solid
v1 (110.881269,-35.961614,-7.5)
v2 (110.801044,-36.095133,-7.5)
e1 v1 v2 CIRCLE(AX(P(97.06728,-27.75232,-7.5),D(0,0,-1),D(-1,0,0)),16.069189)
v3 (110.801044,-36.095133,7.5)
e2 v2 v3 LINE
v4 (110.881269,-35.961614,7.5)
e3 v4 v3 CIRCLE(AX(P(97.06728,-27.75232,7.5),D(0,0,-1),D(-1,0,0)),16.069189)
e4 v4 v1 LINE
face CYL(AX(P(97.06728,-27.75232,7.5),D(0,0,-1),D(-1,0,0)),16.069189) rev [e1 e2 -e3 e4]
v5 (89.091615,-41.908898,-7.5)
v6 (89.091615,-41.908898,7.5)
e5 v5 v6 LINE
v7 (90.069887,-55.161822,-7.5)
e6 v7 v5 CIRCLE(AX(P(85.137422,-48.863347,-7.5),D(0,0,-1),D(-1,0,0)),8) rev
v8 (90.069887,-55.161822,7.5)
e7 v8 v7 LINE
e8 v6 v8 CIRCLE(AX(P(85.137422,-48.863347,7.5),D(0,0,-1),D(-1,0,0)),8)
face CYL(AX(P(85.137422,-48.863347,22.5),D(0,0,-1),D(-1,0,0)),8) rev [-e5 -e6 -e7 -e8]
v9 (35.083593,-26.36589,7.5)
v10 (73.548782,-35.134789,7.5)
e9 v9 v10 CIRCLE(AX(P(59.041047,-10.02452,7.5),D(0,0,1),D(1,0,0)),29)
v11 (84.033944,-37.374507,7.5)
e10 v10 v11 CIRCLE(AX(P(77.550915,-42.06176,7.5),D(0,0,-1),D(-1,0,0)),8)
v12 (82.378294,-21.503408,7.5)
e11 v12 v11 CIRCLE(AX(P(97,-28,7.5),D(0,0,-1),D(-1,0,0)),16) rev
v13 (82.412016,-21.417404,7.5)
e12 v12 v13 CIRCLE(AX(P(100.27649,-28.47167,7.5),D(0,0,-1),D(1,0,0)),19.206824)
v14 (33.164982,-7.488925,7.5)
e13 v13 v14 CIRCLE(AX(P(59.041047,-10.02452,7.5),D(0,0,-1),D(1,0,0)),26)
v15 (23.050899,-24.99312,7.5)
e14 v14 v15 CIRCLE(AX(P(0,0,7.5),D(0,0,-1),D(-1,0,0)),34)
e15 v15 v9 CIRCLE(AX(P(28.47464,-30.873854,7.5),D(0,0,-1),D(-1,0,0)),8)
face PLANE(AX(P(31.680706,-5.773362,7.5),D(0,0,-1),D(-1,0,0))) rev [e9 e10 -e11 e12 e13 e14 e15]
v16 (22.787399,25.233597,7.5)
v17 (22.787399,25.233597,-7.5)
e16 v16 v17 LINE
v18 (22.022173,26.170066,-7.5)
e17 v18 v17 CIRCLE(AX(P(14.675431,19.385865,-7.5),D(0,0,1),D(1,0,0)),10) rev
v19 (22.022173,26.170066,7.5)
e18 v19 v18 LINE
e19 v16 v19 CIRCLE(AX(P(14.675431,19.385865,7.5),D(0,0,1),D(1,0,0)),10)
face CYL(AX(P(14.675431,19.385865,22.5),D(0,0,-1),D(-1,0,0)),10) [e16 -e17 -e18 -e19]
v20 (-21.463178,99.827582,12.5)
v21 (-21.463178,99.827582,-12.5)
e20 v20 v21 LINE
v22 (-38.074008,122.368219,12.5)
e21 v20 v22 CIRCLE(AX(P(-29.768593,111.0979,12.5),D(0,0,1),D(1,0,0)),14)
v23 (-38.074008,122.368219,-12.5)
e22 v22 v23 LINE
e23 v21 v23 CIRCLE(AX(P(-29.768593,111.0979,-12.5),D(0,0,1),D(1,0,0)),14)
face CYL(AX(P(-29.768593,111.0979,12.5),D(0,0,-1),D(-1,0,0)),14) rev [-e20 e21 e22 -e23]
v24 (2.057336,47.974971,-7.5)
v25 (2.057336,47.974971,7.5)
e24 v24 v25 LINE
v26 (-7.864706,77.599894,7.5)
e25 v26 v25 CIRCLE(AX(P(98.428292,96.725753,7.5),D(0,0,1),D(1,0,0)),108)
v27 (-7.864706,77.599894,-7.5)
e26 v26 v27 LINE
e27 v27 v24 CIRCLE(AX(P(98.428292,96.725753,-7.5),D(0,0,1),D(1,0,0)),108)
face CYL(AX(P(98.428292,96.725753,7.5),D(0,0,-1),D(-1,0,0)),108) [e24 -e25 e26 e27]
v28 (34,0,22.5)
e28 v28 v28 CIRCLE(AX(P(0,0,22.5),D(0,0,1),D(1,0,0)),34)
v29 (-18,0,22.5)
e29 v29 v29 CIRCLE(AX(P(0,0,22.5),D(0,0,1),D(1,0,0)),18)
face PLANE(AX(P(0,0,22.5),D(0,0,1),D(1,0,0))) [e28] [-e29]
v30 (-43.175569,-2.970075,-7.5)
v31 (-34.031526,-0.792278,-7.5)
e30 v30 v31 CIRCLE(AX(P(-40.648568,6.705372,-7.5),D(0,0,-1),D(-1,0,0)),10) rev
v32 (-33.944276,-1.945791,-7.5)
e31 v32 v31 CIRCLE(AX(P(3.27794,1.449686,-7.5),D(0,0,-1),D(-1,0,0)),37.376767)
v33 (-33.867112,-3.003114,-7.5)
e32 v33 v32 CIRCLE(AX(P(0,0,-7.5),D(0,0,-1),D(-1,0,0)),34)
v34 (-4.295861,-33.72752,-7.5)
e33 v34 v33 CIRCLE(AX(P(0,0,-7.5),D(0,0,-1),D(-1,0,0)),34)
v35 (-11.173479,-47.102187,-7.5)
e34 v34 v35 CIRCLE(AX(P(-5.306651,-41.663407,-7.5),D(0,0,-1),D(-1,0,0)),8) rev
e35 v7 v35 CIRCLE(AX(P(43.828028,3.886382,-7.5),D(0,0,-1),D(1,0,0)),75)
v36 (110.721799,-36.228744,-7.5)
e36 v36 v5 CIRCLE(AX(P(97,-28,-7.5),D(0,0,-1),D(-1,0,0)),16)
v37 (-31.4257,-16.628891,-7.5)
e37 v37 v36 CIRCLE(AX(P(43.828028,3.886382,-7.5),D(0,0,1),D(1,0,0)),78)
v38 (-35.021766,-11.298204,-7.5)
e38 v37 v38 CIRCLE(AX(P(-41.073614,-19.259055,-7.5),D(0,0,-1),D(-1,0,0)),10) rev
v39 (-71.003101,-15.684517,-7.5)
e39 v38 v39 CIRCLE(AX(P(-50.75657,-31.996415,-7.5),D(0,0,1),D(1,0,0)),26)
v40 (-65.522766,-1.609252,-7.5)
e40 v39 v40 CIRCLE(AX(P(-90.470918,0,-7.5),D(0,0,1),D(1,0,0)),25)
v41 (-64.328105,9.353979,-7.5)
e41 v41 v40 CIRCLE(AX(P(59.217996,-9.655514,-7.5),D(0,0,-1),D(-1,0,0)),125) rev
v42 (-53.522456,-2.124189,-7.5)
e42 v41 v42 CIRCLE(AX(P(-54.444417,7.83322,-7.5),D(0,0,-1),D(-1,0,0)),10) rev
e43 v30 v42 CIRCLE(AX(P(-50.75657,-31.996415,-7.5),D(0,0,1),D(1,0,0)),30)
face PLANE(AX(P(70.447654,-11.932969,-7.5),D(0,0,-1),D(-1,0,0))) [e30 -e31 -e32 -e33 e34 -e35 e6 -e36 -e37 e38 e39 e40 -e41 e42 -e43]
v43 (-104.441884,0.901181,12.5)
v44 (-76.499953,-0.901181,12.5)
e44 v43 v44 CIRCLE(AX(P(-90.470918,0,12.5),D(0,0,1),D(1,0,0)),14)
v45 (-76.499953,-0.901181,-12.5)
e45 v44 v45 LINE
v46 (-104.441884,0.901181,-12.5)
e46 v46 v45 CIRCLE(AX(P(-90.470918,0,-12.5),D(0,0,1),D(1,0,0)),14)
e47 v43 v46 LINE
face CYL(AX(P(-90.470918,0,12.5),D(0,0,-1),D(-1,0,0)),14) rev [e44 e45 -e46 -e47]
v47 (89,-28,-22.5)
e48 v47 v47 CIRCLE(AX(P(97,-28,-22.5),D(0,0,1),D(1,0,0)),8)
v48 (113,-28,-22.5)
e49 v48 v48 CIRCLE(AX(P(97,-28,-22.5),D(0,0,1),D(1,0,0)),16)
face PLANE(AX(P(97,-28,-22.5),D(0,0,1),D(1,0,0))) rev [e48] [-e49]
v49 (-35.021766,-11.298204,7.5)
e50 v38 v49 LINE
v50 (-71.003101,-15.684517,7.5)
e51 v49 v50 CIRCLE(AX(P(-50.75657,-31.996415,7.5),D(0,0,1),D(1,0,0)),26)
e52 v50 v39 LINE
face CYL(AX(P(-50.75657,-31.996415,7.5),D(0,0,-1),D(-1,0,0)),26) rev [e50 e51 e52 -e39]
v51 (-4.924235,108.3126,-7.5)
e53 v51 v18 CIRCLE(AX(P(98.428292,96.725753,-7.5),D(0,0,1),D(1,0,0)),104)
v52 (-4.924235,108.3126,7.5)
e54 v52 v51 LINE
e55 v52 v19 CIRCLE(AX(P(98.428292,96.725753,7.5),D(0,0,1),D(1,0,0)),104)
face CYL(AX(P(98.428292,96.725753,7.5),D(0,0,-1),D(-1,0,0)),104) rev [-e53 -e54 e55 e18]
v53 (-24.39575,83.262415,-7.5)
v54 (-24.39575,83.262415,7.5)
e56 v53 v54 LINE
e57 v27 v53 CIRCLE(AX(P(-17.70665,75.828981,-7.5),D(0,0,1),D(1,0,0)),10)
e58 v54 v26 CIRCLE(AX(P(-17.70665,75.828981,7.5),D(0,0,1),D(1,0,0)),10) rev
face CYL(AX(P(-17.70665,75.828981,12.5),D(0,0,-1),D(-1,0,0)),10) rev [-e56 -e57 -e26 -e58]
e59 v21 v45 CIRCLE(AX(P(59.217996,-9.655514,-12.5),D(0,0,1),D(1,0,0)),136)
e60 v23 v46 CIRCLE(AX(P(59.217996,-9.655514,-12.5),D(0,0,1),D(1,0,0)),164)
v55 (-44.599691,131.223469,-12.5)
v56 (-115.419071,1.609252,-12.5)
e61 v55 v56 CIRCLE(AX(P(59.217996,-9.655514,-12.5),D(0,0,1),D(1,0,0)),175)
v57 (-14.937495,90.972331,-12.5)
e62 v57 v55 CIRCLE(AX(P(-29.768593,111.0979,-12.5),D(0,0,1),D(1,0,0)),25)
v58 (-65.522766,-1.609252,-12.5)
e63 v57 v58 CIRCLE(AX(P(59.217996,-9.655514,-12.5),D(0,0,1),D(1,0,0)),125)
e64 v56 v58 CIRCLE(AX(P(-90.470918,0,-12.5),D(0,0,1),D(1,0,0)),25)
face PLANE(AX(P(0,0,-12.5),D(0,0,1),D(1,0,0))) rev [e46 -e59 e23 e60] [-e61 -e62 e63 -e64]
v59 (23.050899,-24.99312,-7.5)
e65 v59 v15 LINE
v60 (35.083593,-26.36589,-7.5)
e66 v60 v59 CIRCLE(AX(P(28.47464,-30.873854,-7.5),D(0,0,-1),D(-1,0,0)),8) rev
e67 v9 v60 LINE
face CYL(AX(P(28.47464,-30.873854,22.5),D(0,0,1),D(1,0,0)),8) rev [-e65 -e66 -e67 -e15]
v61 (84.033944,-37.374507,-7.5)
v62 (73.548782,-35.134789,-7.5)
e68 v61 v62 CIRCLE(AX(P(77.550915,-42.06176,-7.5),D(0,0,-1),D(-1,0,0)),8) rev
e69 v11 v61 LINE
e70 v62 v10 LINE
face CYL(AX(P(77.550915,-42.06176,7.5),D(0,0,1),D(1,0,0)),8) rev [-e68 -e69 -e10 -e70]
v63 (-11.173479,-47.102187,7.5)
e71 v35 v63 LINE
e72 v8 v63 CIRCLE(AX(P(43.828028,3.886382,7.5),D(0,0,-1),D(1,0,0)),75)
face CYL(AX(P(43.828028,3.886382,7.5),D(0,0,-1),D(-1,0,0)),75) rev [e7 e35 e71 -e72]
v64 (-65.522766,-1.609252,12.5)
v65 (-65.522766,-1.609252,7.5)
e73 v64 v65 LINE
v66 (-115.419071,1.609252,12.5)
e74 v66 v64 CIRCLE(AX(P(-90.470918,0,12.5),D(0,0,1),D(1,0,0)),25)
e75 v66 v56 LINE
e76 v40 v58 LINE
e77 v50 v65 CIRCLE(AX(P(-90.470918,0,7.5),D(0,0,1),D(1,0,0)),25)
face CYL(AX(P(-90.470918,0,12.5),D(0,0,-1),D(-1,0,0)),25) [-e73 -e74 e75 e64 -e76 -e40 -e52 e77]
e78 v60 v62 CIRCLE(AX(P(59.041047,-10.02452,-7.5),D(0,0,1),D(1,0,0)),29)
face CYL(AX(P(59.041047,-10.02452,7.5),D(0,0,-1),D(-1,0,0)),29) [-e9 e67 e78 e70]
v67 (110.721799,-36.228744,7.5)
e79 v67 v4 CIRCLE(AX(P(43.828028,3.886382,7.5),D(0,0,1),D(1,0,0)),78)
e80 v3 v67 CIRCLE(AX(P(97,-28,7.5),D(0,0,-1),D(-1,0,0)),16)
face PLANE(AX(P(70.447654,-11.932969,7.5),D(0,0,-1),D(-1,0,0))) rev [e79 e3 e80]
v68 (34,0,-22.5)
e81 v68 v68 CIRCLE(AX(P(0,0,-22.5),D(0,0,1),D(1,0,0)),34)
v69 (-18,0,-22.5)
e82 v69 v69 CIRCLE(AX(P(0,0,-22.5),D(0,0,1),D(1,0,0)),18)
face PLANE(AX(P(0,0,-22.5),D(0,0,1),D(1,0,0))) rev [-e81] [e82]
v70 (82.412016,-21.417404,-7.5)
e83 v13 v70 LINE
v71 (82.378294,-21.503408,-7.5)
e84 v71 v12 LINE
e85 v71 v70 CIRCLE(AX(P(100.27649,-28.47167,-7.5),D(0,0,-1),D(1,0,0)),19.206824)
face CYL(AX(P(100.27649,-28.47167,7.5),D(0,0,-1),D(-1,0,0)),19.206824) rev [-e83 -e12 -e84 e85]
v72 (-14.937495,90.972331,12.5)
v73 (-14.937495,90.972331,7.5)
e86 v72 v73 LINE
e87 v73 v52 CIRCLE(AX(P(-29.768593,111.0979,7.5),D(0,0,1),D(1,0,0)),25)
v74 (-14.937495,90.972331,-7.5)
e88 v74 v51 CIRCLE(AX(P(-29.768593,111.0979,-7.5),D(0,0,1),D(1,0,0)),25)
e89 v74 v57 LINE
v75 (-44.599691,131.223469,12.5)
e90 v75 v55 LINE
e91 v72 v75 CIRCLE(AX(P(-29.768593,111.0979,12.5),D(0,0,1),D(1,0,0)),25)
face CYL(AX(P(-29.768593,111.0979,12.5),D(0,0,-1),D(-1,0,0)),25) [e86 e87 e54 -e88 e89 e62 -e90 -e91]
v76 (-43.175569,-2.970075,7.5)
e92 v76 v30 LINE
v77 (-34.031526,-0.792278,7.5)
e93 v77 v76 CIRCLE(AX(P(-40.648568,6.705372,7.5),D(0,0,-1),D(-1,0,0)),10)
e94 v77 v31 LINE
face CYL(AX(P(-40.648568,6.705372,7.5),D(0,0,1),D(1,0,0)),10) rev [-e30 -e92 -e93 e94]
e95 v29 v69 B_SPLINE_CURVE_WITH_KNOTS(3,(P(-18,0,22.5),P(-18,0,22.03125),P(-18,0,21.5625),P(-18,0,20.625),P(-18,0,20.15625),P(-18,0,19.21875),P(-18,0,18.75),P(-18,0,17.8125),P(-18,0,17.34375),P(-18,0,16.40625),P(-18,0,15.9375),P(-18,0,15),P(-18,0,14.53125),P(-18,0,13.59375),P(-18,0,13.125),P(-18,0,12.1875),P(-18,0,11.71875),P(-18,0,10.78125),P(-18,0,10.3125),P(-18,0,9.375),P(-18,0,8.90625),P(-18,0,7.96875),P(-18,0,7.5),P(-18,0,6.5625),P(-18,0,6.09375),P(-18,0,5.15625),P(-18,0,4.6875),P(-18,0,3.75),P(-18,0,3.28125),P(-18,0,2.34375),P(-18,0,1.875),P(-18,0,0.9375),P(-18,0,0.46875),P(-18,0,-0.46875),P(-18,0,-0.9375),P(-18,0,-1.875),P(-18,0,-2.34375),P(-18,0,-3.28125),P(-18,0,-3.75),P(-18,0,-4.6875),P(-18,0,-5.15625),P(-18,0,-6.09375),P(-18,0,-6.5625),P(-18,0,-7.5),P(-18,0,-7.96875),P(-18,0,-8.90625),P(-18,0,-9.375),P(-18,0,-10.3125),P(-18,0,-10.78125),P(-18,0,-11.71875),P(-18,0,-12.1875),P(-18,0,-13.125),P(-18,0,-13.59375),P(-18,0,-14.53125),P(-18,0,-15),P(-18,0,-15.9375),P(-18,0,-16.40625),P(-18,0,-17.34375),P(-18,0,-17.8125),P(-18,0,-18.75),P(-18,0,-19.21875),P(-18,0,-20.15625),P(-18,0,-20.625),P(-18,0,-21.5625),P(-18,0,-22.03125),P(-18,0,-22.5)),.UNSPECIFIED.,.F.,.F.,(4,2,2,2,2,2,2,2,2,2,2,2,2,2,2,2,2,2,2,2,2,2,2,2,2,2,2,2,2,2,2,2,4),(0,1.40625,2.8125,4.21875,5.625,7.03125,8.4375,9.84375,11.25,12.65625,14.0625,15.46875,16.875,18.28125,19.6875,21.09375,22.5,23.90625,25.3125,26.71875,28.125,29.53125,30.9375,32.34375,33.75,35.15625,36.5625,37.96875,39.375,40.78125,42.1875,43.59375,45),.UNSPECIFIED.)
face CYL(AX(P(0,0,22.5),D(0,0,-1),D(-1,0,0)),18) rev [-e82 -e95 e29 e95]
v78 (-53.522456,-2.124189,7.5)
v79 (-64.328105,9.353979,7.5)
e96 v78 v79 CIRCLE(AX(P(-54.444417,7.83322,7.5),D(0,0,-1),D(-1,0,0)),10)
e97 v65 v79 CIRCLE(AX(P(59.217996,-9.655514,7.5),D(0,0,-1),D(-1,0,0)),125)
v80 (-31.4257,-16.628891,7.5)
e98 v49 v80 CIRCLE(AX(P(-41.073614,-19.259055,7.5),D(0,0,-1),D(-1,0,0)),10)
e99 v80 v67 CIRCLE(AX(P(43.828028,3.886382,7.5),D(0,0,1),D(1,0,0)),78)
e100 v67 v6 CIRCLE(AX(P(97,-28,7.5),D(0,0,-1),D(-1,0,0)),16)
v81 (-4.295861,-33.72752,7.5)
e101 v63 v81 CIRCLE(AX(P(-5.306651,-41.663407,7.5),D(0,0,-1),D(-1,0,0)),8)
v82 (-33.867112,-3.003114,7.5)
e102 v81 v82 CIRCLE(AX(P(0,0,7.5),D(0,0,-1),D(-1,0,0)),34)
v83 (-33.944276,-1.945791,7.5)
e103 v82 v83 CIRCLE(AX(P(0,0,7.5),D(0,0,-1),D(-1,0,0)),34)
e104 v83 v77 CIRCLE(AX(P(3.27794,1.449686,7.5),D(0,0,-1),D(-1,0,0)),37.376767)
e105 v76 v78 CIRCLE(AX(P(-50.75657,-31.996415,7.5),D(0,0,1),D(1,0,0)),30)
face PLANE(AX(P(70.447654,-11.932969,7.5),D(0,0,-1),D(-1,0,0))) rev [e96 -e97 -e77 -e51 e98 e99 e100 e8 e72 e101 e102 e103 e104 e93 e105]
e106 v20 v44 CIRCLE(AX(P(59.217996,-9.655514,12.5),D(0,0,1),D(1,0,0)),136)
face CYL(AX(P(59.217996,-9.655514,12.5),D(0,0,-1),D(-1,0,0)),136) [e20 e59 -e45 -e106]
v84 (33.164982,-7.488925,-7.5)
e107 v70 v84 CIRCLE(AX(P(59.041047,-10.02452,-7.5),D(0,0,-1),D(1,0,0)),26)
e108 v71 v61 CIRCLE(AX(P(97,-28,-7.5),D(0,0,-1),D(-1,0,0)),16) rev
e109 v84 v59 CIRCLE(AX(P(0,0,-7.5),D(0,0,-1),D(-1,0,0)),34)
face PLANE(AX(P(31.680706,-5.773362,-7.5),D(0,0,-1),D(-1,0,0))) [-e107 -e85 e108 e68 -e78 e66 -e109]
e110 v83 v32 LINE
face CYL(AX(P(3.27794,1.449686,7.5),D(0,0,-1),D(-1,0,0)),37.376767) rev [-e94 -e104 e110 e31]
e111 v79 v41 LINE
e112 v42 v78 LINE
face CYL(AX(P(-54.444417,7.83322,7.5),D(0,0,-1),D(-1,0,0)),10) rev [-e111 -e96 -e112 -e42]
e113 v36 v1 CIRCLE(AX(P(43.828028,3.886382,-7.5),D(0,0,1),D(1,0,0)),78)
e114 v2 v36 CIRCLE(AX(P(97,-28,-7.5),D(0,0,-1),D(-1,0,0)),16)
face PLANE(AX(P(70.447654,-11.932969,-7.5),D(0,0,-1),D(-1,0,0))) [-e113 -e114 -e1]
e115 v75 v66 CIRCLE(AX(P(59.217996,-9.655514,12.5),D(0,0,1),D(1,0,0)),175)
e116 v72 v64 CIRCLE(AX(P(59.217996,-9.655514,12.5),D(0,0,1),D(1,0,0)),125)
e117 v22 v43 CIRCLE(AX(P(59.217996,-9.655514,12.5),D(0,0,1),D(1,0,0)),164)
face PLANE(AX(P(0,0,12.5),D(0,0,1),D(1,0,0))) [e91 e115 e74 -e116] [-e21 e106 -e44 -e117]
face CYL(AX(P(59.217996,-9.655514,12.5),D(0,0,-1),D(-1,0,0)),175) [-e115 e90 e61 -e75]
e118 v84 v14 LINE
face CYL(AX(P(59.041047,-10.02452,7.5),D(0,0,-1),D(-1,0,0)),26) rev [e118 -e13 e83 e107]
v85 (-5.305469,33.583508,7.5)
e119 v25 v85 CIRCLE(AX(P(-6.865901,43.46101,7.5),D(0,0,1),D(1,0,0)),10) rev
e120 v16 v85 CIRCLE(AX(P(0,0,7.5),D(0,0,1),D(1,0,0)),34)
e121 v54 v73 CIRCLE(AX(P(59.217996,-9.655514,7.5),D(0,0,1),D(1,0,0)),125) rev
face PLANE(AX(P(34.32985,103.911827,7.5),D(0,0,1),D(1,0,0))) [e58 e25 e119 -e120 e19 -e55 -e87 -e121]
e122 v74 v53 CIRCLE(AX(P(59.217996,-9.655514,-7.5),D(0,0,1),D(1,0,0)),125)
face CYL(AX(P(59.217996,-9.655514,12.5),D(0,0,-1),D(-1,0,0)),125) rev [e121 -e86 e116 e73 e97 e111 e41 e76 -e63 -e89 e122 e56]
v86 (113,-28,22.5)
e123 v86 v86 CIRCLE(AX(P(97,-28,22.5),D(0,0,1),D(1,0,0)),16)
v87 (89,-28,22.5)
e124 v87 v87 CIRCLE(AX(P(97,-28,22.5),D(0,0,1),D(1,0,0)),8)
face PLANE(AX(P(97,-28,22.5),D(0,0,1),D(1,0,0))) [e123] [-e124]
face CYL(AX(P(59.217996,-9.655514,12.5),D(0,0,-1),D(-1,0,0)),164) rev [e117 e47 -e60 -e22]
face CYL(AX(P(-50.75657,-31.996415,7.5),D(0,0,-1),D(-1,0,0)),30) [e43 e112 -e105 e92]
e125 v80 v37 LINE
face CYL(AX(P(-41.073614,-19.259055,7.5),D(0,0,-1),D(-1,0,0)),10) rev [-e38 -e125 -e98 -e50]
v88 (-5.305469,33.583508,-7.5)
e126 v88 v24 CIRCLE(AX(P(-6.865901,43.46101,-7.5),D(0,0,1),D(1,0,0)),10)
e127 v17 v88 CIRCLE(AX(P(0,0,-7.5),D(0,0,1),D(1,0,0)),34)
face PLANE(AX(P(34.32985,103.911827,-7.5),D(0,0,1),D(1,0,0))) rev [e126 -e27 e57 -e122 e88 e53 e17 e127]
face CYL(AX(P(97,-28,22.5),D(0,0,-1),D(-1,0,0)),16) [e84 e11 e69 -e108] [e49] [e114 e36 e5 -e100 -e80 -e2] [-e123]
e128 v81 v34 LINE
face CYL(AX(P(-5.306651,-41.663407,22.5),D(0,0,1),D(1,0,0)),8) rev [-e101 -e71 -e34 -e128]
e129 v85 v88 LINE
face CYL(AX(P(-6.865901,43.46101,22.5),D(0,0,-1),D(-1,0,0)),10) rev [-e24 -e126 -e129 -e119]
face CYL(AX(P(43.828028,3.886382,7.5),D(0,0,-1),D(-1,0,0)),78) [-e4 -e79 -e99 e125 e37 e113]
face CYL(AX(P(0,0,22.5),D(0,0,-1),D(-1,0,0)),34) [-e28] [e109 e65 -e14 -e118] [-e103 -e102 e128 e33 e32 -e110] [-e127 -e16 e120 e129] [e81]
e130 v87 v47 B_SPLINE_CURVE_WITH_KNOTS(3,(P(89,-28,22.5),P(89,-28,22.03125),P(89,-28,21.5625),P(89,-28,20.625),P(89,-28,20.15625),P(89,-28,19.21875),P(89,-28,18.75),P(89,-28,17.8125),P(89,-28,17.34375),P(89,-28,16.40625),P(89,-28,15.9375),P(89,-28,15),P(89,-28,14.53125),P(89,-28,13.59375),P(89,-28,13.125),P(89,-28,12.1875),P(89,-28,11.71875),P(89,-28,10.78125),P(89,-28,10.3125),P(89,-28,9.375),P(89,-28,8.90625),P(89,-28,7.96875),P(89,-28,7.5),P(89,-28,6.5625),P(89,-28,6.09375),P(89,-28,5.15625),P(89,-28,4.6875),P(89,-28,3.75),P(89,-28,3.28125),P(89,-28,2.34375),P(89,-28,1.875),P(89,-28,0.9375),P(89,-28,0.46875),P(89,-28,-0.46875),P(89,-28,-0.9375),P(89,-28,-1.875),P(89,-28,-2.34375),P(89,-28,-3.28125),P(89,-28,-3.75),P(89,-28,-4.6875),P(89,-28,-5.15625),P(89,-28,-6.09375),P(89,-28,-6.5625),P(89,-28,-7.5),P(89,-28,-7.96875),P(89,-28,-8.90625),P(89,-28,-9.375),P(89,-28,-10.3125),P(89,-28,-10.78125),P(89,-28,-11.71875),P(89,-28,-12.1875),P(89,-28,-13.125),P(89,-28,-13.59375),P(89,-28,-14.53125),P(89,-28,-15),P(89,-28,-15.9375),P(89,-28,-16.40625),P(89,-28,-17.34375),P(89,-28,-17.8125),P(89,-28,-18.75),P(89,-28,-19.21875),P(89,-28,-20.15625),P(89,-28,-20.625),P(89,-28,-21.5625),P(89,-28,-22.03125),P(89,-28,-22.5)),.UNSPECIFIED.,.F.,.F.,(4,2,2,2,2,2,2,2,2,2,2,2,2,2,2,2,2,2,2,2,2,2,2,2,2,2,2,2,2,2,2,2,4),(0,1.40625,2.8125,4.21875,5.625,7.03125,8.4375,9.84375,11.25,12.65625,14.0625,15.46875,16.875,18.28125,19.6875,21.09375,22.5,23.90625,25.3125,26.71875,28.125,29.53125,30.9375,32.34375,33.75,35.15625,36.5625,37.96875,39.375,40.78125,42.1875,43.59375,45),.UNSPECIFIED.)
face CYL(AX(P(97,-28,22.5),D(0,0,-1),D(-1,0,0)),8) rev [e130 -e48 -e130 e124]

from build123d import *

# Parameters (mm, degrees)
SKETCH1_R            = 34
SKETCH1_R_2          = 18
BOSS_EXTRUDE1_DEPTH  = 22.5
SKETCH2_R            = 16
SKETCH2_R_2          = 8
BOSS_EXTRUDE2_DEPTH  = 22.5
BOSS_EXTRUDE4_DEPTH  = 7.5
BOSS_EXTRUDE5_DEPTH  = 7.5
BOSS_EXTRUDE13_DEPTH = 12.5
BOSS_EXTRUDE14_DEPTH = 7.5
FILLET14_R           = 10
FILLET16_R           = 8
FILLET17_R           = 8


with BuildPart() as part:
    # Sketch1 → Boss-Extrude1 (new, symmetric)
    with BuildSketch(Plane.XY):
        with Locations(Location((0, 0, 0), (0, 0, 180))):
            Circle(SKETCH1_R)
        with Locations(Location((0, 0, 0), (0, 0, 180))):
            Circle(SKETCH1_R_2, mode=Mode.SUBTRACT)
    extrude(amount=BOSS_EXTRUDE1_DEPTH, both=True)



with BuildPart() as body_2:
    # Sketch2 → Boss-Extrude2 (new, symmetric)
    with BuildSketch(Plane.XY):
        with Locations(Location((97, -28, 0), (0, 0, 180))):
            Circle(SKETCH2_R)
        with Locations(Location((97, -28, 0), (0, 0, 180))):
            Circle(SKETCH2_R_2, mode=Mode.SUBTRACT)
    extrude(amount=BOSS_EXTRUDE2_DEPTH, both=True)


with BuildPart() as part_1:
    add(part.part)

    add(body_2.part)  # Boss-Extrude4 merges body 2
    # Sketch4 → Boss-Extrude4 (add, symmetric)
    with BuildSketch(Plane.XY):
        with BuildLine():
            ThreePointArc((33.206005609, -7.1003724), (51.777283235, -34.98924979), (82.412015856, -21.417404229))
            ThreePointArc((82.412015856, -21.417404229), (81.371091146, -25.082275632), (81.074017469, -28.880505994))
            ThreePointArc((81.074017469, -28.880505994), (51.369473654, -37.991410417), (30.470988374, -14.999633287))
            ThreePointArc((30.470988374, -14.999633287), (32.120493939, -11.147640651), (33.206005609, -7.1003724))
        make_face()
    extrude(amount=BOSS_EXTRUDE4_DEPTH, both=True)

    # Sketch5 → Boss-Extrude5 (add, symmetric)
    with BuildSketch(Plane.XY):
        with BuildLine():
            ThreePointArc((-34.031526001, -0.792277944), (25.431977893, -71.913257024), (110.881269035, -35.961614448))
            ThreePointArc((110.881269035, -35.961614448), (107.27285681, -40.164612784), (102.451649001, -42.892577053))
            ThreePointArc((102.451649001, -42.892577053), (30.885190637, -69.988396494), (-27.207046107, -20.176415768))
            ThreePointArc((-27.207046107, -20.176415768), (-31.977671369, -10.96258702), (-34.031526001, -0.792277944))
        make_face()
    extrude(amount=BOSS_EXTRUDE5_DEPTH, both=True)



with BuildPart() as body_2_2:
    # Sketch8 → Boss-Extrude13 (new, symmetric)
    with BuildSketch(Plane.XY):
        with BuildLine():
            ThreePointArc((-14.937494573, 90.972331385), (-50.475974734, 50.279724458), (-65.522765853, -1.609252288))
            ThreePointArc((-65.522765853, -1.609252288), (-92.080170519, -24.948152378), (-115.419070609, 1.609252288))
            ThreePointArc((-115.419070609, 1.609252288), (-94.353563042, 74.253819732), (-44.599690817, 131.223469431))
            ThreePointArc((-44.599690817, 131.223469431), (-9.643023672, 125.92899853), (-14.937494573, 90.972331385))
        make_face()
        with BuildLine():
            ThreePointArc((-104.441883562, 0.901181281), (-91.372099512, -13.970965332), (-76.499952899, -0.901181281))
            ThreePointArc((-76.499952899, -0.901181281), (-60.129044162, 55.554025418), (-21.463177747, 99.827581755))
            ThreePointArc((-21.463177747, 99.827581755), (-18.498274042, 119.403315356), (-38.074007643, 122.368219061))
            ThreePointArc((-38.074007643, 122.368219061), (-84.700493614, 68.979518772), (-104.441883562, 0.901181281))
        make_face(mode=Mode.SUBTRACT)
    extrude(amount=BOSS_EXTRUDE13_DEPTH, both=True)


with BuildPart() as part_2:
    add(part_1.part)

    add(body_2_2.part)  # Boss-Extrude14 merges body 2 2
    # Sketch8<9> → Boss-Extrude14 (add, symmetric)
    with BuildSketch(Plane.XY):
        with BuildLine():
            ThreePointArc((-4.924235101, 108.312600467), (-0.101365505, 63.440523319), (23.275646022, 24.836395161))
            ThreePointArc((23.275646022, 24.836395161), (18.02581673, 28.582349539), (12.304584847, 31.558989848))
            ThreePointArc((12.304584847, 31.558989848), (-3.899104901, 62.184418871), (-9.571104645, 96.364894046))
            ThreePointArc((-9.571104645, 96.364894046), (-6.468831174, 102.035830387), (-4.924235101, 108.312600467))
        make_face()
        with BuildLine():
            ThreePointArc((-31.919461404, -14.075384629), (-51.826123505, -6.018423189), (-71.003100626, -15.684517133))
            ThreePointArc((-71.003100626, -15.684517133), (-68.148351126, -11.256242618), (-66.285052548, -6.32802506))
            ThreePointArc((-66.285052548, -6.32802506), (-49.617118255, -2.018061944), (-33.32443821, -7.580830374))
            ThreePointArc((-33.32443821, -7.580830374), (-32.713889809, -10.847997022), (-31.919461404, -14.075384629))
        make_face()
    extrude(amount=BOSS_EXTRUDE14_DEPTH, both=True)

    # Fillet14
    # the kernel refuses this fillet: 10 mm, written as the material it adds along each edge
    with BuildSketch(Plane(origin=(-9.571104645, 96.364894046, -7.5), x_dir=(-0.7492882116327264, -0.6622440455815594, 0), z_dir=(0, 0, 1))) as fillet14_piece_1:
        with BuildLine():
            CenterArc((19.69565471, 9.999601125), FILLET14_R, 148.729139323, 121.782610057)
            Line((11.148425358, 15.19044599), (10.293702423, 15.709530477))
            ThreePointArc((10.293702423, 15.709530477), (5.099940987, 7.943295893), (-0.751496774, 0.659736764))
            Line((-0.751496774, 0.659736764), (0.215075759, -0.976597367))
            ThreePointArc((0.215075759, -0.976597367), (7.503554375, -0.509342466), (19.793902231, -0.999960113))
            Line((19.793902231, -0.999960113), (19.784970638, 0))
        make_face()
    extrude(amount=15)
    with BuildSketch(Plane(origin=(12.159345053, 31.751383086, -7.5), x_dir=(-0.5285784325634836, 0.8488844683634699, 0), z_dir=(0, 0, 1))) as fillet14_piece_2:
        with BuildLine():
            CenterArc((19.996455315, 9.960779633), FILLET14_R, 157.06784833, 107.855989322)
            ThreePointArc((10.786786288, 13.857187776), (6.303465021, 6.220170866), (0, 0))
            ThreePointArc((0, 0), (9.555828204, 0.423579966), (19.111656407, 0))
        make_face()
    extrude(amount=15)
    with BuildSketch(Plane(origin=(-32.126211784, -13.860546046, -7.5), x_dir=(-0.7488822965541873, 0.6627030299521243, 0), z_dir=(0, 0, 1))) as fillet14_piece_3:
        with BuildLine():
            CenterArc((3.122942969, 9.972317771), FILLET14_R, 236.75546449, 37.508743658)
            ThreePointArc((-2.359191707, 1.608933325), (-1.172232304, 0.815263894), (0, 0))
            ThreePointArc((0, 0), (1.933250409, -0.071973796), (3.866500819, 0))
        make_face()
    extrude(amount=15)
    with BuildSketch(Plane(origin=(-33.32443821, -7.580830374, -7.5), x_dir=(-0.9057047717229613, 0.42390903089962434, 0), z_dir=(0, 0, 1))) as fillet14_piece_4:
        with BuildLine():
            CenterArc((12.689549677, -9.834316561), FILLET14_R, 100.444283177, 56.0673219)
            ThreePointArc((3.518141468, -5.84868343), (1.823073957, -2.885842043), (0, 0))
            ThreePointArc((0, 0), (5.438378433, -0.497050317), (10.876756866, 0))
        make_face()
    extrude(amount=15)
    with BuildSketch(Plane(origin=(-66.285052548, -6.32802506, -7.5), x_dir=(0.12382892083322194, 0.9923035817557446, 0), z_dir=(0, 0, 1))) as fillet14_piece_5:
        with BuildLine():
            CenterArc((15.518466833, -9.995933117), FILLET14_R, 88.36588285, 104.037213694)
            Line((5.751860117, -12.143814227), (4.775199446, -12.358602338))
            ThreePointArc((4.775199446, -12.358602338), (2.660832169, -6.173787211), (-0.784932001, -0.619581919))
            Line((-0.784932001, -0.619581919), (0.131376491, 0.991332546))
            ThreePointArc((0.131376491, 0.991332546), (4.717150823, 0.82611724), (15.832152273, 0.999593312))
            Line((15.832152273, 0.999593312), (15.803635414, 0))
        make_face()
    extrude(amount=15)
    # the kernel refuses this fillet: 10 mm, written as the material it takes off along each edge
    with BuildSketch(Plane(origin=(23.275646022, 24.836395161, 12.075662987), x_dir=(-0.775723763432973, 0.6310726129736459, 0), z_dir=(0, 0, -1))) as fillet14_2_piece_1:
        with BuildLine():
            CenterArc((3.231710715, -9.655465783), FILLET14_R, 98.150393055, 6.933334265)
            ThreePointArc((1.813991439, 0.243527704), (0.907531451, 0.117773287), (0, 0))
            ThreePointArc((0, 0), (0.314703895, 0.001074211), (0.62940779, 0))
        make_face()
    extrude(amount=24.151325973, mode=Mode.SUBTRACT)

    # Fillet16
    fillet16_edges = [part_2.edges().sort_by_distance(p)[0] for p in [
        (102.283564786, -43.10244825, 0),
        (-27.073199852, -20.567981178, 0),
    ]]
    fillet(fillet16_edges, radius=FILLET16_R)

    # Fillet17
    fillet17_edges = [part_2.edges().sort_by_distance(p)[0] for p in [
        (30.481870475, -15.06172541, 0),
        (81.027337873, -28.934914209, 0),
    ]]
    fillet(fillet17_edges, radius=FILLET17_R)


solid = part_2.part
